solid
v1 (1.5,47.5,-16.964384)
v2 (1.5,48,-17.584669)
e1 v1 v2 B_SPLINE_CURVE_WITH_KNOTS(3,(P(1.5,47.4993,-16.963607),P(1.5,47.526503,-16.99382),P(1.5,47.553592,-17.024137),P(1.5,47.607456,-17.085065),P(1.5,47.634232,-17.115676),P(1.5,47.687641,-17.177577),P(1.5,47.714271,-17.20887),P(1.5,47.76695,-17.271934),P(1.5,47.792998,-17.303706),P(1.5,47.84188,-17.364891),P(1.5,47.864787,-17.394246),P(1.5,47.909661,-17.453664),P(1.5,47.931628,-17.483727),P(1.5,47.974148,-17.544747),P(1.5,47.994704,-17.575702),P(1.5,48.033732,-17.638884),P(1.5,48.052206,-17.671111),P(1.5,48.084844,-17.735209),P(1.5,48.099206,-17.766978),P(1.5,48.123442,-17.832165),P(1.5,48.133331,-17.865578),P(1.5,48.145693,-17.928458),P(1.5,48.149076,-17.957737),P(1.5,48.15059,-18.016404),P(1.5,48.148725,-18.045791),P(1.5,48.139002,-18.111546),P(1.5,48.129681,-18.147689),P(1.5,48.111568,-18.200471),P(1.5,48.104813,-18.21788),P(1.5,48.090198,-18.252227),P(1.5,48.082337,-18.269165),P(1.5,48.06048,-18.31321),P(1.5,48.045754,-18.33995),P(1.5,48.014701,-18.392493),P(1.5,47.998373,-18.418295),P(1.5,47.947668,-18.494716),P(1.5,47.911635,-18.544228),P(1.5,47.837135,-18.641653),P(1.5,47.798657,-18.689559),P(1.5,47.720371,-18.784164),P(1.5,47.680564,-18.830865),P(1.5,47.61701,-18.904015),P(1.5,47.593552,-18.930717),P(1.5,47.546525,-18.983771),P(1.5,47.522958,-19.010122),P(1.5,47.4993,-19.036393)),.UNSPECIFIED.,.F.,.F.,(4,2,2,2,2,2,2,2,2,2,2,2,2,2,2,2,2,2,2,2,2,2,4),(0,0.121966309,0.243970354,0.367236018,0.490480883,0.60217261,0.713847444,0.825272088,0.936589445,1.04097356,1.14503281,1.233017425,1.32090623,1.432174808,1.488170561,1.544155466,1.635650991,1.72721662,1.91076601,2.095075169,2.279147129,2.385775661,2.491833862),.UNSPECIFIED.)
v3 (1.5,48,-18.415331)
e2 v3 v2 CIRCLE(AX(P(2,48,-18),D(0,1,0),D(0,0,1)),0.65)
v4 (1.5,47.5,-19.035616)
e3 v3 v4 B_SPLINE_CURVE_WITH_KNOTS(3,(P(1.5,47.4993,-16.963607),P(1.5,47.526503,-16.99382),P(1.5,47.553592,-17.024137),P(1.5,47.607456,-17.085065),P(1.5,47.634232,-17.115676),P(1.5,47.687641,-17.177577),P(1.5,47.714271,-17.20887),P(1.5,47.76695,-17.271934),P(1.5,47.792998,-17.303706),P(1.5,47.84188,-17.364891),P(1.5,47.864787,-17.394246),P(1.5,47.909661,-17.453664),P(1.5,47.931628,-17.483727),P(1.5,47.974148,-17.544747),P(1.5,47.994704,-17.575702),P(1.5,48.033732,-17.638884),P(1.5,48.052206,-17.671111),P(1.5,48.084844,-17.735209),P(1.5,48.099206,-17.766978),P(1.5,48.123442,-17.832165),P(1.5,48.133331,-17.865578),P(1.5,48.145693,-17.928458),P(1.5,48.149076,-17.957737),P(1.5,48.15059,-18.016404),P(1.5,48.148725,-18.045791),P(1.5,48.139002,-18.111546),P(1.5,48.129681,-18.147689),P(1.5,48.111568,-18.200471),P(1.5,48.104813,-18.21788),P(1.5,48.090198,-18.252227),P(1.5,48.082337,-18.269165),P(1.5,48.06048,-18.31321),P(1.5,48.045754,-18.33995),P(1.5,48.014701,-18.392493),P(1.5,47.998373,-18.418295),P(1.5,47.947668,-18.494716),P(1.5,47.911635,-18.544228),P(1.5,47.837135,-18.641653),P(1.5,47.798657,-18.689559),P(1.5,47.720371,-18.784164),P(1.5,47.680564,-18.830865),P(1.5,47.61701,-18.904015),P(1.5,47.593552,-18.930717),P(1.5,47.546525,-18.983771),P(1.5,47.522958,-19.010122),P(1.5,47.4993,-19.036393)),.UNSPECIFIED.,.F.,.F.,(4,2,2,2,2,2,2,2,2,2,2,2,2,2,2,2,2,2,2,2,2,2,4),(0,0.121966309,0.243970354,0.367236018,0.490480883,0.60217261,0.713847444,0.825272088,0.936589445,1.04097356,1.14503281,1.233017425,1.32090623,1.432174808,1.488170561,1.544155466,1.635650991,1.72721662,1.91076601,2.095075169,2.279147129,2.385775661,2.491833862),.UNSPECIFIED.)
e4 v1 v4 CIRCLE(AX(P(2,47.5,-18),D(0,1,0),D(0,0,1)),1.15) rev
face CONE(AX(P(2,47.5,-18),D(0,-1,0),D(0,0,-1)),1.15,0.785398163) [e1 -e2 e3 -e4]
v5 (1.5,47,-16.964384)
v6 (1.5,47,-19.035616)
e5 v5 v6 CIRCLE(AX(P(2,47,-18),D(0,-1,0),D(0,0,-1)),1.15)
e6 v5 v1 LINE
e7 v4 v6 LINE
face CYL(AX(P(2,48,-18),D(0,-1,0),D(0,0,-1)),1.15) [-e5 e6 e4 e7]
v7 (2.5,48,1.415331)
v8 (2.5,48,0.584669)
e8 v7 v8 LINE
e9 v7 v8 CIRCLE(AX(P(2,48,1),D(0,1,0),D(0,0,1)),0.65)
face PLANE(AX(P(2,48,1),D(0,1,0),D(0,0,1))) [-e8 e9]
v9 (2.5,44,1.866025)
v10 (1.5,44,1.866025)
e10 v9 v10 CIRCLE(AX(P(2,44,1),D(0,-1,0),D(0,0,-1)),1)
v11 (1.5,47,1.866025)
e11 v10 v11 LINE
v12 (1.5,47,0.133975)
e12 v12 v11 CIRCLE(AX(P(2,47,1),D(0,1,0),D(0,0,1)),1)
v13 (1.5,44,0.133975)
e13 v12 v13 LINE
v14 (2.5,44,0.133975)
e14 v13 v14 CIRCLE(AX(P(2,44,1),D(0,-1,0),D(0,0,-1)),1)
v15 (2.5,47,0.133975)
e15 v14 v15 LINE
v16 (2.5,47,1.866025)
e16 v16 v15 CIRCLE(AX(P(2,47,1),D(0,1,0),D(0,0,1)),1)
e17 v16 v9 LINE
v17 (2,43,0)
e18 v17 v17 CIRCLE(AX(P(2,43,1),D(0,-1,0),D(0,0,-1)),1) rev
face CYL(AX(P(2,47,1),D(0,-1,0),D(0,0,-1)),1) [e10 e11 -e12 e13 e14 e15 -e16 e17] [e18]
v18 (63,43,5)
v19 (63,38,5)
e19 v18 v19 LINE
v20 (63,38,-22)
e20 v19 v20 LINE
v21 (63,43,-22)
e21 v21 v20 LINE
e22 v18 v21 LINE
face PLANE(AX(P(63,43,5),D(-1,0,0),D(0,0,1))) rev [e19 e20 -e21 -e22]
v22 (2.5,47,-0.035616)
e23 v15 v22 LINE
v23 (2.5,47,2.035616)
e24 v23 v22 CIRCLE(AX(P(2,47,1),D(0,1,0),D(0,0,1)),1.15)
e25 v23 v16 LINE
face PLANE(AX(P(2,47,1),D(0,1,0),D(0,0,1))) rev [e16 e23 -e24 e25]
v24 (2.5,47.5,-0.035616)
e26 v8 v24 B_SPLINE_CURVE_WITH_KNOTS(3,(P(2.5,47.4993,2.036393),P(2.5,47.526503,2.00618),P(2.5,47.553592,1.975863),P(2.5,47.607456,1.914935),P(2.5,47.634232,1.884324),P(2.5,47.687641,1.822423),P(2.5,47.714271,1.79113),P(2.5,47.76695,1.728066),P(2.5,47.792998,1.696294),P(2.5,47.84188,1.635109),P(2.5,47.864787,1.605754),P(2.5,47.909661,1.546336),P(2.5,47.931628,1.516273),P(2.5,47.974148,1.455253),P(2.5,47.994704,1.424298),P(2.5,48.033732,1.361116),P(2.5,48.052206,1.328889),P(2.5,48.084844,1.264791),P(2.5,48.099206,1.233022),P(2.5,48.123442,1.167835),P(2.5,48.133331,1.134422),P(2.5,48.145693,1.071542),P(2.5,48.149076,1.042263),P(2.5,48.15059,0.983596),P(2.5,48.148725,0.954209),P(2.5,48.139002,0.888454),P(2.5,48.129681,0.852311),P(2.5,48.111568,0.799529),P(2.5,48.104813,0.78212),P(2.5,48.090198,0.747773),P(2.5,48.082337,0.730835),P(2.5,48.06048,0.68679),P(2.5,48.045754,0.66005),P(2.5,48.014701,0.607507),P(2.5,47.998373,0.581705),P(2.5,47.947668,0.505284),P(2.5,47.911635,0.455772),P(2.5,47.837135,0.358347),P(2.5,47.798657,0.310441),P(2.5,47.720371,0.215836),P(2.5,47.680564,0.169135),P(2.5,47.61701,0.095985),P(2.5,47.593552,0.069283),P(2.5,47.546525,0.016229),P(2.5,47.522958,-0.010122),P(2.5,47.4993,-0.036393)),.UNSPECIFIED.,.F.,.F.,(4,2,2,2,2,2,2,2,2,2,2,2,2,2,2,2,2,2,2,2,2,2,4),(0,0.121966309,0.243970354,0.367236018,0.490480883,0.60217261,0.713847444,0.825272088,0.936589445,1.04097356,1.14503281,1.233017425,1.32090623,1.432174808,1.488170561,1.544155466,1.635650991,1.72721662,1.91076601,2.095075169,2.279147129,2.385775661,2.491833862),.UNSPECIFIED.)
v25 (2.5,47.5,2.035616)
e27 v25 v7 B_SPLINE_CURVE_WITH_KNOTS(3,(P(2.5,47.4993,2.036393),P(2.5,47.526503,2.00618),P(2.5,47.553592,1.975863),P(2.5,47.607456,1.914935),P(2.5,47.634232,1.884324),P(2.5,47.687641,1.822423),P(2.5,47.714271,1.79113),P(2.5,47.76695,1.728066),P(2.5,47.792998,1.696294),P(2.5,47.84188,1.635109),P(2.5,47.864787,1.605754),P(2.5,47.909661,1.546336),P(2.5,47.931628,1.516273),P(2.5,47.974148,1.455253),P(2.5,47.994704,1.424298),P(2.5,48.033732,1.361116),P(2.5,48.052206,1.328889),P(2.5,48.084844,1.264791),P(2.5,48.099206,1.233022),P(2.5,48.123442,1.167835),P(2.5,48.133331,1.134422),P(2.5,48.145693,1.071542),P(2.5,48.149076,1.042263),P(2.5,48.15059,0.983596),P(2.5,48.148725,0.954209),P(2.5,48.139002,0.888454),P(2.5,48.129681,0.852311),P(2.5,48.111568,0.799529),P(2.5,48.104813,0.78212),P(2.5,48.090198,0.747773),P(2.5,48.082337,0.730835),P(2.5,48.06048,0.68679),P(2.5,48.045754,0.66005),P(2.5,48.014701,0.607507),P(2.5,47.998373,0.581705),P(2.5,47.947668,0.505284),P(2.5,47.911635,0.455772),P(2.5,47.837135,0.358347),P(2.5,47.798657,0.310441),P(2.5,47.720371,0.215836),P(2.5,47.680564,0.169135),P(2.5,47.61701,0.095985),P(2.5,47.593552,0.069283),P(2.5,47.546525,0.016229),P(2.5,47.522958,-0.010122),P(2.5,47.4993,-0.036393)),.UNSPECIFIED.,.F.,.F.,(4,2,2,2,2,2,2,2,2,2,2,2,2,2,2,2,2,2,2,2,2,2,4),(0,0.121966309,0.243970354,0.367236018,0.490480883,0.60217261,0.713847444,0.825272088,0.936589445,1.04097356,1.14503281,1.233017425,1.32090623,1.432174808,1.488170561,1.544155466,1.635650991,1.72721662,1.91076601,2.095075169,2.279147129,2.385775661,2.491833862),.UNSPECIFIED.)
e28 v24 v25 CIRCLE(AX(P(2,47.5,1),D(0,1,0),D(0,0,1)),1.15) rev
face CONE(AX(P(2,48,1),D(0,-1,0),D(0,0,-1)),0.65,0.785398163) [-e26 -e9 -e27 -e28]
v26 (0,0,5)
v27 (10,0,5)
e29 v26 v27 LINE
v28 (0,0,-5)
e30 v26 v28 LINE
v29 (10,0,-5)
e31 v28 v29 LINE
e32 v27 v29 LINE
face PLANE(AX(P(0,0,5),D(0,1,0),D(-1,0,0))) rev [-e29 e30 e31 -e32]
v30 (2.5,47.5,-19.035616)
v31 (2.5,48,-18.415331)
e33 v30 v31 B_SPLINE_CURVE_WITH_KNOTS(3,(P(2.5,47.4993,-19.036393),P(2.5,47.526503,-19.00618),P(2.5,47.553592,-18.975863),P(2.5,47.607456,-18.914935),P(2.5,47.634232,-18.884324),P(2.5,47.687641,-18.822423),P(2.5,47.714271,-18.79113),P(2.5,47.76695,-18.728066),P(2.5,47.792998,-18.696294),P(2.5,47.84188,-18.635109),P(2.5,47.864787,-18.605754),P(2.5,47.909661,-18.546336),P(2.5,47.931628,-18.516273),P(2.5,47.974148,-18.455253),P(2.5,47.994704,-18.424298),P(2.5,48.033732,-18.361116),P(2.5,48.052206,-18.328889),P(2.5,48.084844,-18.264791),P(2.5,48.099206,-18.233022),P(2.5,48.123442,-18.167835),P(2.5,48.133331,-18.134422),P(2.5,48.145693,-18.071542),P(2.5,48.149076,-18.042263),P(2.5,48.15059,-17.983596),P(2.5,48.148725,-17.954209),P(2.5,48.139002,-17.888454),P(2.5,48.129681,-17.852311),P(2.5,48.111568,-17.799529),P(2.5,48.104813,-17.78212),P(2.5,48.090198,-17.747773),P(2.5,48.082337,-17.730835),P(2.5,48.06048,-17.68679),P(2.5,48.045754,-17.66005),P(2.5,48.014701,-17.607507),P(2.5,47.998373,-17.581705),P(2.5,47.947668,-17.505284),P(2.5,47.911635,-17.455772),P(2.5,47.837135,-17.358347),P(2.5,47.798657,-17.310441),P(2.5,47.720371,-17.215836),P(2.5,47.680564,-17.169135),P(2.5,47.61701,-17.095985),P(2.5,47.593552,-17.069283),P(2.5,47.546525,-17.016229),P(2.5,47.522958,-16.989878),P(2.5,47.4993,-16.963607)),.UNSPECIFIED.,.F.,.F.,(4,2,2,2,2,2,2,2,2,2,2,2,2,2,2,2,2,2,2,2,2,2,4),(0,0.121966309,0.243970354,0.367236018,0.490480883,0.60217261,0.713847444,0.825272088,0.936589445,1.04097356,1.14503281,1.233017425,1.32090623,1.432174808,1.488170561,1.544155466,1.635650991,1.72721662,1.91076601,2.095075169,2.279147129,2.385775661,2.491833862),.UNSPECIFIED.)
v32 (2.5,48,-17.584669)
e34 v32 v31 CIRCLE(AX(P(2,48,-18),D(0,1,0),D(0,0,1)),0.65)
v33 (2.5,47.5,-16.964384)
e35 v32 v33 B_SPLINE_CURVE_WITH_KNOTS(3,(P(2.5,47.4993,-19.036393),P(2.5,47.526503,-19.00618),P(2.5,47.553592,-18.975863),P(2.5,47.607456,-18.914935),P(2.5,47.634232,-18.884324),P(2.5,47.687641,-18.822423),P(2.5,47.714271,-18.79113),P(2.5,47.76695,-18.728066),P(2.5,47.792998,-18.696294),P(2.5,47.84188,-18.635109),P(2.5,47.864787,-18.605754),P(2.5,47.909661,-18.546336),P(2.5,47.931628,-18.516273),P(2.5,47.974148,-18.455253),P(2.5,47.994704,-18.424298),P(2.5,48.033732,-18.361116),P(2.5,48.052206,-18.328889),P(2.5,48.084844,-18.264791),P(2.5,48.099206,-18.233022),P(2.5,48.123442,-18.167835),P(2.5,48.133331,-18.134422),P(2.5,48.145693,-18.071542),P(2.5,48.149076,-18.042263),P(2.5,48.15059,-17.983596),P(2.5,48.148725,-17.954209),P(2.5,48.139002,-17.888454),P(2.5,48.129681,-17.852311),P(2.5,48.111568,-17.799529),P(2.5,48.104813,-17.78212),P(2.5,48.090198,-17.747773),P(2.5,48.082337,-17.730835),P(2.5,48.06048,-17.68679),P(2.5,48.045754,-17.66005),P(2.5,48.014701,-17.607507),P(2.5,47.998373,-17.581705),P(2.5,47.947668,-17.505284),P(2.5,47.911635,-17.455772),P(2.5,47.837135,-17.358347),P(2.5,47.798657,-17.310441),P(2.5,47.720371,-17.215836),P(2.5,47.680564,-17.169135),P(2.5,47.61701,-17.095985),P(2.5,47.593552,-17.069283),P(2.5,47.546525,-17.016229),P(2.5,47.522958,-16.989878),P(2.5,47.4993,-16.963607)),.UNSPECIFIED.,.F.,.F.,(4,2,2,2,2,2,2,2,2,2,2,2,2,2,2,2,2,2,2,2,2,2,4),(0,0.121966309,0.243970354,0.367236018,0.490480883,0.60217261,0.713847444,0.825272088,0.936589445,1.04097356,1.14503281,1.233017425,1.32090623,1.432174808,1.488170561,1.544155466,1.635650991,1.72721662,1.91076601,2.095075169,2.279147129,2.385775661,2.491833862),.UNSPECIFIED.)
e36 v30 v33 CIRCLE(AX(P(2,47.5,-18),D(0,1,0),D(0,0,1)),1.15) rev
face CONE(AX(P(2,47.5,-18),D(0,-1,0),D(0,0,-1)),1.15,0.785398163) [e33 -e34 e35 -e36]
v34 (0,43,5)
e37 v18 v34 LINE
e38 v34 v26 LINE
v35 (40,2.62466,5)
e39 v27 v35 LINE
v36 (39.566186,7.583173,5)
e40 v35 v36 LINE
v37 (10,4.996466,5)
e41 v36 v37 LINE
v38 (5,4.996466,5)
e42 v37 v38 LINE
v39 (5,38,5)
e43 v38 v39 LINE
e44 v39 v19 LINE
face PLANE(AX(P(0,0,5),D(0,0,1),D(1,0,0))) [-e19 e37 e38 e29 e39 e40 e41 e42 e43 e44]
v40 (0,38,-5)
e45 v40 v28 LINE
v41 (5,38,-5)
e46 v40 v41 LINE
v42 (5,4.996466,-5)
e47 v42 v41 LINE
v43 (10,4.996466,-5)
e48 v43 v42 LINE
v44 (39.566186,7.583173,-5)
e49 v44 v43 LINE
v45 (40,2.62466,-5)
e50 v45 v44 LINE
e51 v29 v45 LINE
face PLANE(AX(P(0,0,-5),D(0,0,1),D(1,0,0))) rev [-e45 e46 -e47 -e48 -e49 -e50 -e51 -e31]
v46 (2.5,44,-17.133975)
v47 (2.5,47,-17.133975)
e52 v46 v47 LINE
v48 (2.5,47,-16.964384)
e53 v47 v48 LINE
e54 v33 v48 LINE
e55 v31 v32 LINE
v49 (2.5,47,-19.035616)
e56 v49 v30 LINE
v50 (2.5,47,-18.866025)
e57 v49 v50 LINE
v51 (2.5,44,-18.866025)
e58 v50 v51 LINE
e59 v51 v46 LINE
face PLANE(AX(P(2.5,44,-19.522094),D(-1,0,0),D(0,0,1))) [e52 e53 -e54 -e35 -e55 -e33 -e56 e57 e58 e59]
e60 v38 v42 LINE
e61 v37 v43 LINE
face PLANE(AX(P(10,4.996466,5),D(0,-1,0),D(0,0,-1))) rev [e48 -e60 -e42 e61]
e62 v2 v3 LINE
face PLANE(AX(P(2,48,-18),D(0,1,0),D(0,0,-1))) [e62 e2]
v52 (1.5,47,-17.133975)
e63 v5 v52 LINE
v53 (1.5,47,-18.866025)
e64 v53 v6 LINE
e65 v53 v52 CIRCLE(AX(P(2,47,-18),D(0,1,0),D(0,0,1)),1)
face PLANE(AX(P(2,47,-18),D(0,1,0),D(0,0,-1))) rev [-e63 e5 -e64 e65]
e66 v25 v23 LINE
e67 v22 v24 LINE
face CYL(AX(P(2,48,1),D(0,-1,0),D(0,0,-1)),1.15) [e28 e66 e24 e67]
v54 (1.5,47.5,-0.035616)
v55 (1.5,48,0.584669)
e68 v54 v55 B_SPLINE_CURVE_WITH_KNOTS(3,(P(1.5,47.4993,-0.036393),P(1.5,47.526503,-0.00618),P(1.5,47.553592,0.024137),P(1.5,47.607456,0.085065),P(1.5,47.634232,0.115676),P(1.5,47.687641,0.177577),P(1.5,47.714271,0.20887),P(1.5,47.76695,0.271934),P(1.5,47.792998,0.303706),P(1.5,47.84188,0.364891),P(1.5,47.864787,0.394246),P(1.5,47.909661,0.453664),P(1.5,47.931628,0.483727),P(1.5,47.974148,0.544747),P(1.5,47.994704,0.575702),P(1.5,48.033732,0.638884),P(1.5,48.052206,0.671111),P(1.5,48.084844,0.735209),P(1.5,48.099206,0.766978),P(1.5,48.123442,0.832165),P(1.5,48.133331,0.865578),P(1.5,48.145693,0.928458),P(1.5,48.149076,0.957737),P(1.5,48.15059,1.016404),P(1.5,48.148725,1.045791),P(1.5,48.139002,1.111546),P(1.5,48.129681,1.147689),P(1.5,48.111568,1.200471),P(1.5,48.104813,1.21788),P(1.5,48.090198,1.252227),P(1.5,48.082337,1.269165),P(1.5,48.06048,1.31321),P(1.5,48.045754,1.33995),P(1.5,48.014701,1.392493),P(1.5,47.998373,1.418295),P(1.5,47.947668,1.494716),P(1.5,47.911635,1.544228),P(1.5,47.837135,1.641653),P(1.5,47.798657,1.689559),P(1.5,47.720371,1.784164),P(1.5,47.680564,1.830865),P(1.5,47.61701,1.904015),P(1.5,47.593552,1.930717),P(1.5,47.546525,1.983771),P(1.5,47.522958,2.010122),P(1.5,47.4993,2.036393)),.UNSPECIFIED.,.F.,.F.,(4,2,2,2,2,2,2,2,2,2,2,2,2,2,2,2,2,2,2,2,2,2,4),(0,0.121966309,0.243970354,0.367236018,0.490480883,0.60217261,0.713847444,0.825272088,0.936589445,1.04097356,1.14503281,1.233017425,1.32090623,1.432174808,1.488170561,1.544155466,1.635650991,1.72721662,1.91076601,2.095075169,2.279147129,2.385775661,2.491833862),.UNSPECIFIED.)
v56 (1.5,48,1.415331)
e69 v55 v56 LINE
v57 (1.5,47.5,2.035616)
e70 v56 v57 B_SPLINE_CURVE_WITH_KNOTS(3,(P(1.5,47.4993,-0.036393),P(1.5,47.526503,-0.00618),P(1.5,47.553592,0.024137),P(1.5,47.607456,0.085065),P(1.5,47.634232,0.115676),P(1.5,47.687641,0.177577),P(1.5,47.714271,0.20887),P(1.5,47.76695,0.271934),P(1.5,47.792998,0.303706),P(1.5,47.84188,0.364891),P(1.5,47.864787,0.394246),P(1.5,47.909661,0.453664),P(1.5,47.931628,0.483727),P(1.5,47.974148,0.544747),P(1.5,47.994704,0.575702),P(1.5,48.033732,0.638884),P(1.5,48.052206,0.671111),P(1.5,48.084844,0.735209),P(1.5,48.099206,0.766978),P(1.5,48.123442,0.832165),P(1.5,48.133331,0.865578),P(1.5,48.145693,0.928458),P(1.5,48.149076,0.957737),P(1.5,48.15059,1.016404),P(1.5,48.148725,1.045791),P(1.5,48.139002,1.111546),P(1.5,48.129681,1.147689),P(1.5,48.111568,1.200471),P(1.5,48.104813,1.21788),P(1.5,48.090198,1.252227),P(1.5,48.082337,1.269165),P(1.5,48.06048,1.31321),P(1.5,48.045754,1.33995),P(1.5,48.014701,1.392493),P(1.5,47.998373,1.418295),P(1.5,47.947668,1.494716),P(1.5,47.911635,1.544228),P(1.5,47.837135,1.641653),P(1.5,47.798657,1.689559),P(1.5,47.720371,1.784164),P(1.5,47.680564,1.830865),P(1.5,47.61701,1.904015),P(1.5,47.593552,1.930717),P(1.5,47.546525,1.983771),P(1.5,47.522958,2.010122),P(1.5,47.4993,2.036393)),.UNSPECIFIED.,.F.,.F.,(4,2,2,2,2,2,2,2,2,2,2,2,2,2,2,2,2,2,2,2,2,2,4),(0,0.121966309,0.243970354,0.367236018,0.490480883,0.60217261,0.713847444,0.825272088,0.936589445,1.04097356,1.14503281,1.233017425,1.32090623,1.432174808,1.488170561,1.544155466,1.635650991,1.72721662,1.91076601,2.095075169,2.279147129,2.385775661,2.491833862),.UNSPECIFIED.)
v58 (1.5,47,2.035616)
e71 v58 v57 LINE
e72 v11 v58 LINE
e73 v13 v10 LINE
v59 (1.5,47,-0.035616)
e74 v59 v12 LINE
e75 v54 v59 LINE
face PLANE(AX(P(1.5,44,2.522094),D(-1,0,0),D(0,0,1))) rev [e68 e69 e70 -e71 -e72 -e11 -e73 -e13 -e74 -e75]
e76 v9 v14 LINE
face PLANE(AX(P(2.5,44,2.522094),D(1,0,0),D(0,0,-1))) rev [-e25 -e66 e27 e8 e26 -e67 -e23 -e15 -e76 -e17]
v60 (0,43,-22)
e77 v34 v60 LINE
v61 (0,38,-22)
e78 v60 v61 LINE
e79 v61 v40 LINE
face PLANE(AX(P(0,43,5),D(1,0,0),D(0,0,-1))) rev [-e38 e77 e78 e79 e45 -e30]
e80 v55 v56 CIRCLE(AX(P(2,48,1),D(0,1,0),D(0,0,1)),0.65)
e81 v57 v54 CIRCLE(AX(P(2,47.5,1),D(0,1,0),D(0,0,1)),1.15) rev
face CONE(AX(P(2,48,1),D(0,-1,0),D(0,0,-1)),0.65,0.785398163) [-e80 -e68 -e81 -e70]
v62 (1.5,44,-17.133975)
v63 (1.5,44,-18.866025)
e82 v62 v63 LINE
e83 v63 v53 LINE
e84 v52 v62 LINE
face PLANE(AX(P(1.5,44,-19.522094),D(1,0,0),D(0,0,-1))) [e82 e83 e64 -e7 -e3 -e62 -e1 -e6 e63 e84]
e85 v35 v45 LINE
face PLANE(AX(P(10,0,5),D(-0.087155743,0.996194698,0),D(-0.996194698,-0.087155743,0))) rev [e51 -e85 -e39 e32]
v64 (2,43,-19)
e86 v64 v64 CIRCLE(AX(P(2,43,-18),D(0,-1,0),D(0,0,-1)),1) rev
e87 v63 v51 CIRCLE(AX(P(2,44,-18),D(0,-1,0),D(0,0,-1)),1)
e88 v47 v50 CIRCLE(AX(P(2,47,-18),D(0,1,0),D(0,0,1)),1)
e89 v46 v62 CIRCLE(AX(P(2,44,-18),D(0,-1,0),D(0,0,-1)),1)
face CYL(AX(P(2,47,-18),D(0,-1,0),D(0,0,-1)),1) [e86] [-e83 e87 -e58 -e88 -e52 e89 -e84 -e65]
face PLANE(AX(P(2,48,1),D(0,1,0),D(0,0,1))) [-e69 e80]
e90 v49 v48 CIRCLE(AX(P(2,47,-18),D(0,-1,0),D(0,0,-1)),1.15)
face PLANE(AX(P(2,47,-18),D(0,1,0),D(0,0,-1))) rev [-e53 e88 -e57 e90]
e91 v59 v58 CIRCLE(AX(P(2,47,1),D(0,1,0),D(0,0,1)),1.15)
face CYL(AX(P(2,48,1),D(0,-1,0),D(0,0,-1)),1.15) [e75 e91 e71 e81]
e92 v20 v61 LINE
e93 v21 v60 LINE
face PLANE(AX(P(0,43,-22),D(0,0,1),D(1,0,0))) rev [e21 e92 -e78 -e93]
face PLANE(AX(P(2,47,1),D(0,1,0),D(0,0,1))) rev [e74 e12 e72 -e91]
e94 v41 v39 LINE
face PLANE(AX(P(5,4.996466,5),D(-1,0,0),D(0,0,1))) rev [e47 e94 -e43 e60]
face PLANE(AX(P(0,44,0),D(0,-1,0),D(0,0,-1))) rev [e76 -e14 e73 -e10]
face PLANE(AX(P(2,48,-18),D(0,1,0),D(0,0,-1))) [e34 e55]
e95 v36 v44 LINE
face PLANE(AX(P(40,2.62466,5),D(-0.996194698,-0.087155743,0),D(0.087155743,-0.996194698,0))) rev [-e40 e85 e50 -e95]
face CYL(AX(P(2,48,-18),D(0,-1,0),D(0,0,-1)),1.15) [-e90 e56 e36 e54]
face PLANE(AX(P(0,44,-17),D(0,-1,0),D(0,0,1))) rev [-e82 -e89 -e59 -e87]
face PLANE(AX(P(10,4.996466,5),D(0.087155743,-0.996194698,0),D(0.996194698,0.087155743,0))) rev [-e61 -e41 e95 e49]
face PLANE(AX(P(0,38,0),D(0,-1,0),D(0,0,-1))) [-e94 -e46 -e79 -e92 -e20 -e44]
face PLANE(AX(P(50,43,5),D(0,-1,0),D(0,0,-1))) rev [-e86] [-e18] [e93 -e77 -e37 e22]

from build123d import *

# Parameters (mm, degrees)
BOSS_EXTRUDE1_DEPTH = 5
SKETCH3_W           = 63
SKETCH3_H           = 27
BOSS_EXTRUDE3_DEPTH = 2.5
SKETCH4_R           = 1
BOSS_EXTRUDE6_DEPTH = 4
SKETCH5_W           = 1
SKETCH5_H           = 3.04418771
CUT_EXTRUDE1_DEPTH  = 3
SKETCH6_R           = 1.15
BOSS_EXTRUDE7_DEPTH = 1
CHAMFER1_SIZE       = 0.5
SKETCH7_W           = 1
SKETCH7_H           = 2.786400566
CUT_EXTRUDE3_DEPTH  = 1
MIRROR2_START       = 47
MIRROR2_DEPTH       = 1


with BuildPart() as part:
    # Sketch1 → Boss-Extrude1 (new, symmetric)
    with BuildSketch(Plane.XY):
        Polygon((0, 0), (10, 0), (40, 2.624659906), (39.566186352, 7.583172591), (10, 4.996466462), (5, 4.996466462), (5, 38.996466462), (50, 38.996466462), (50, 43), (0, 43), align=None)
    extrude(amount=BOSS_EXTRUDE1_DEPTH, both=True)

    # Sketch3 → Boss-Extrude3 (add, symmetric)
    with BuildSketch(Plane(origin=(0, 40.5, 0), x_dir=(1, 0, 0), z_dir=(0, 1, 0))):
        with Locations((31.5, 8.5)):
            Rectangle(SKETCH3_W, SKETCH3_H)
    extrude(amount=BOSS_EXTRUDE3_DEPTH, both=True)

    # Sketch4 → Boss-Extrude6 (add)
    with BuildSketch(Plane(origin=(0, 43, 0), x_dir=(1, 0, 0), z_dir=(0, 1, 0))):
        with Locations(Location((2, -1, 0), (0, 0, 90))):
            Circle(SKETCH4_R)
        with Locations(Location((2, 18, 0), (0, 0, 90))):
            Circle(SKETCH4_R)
    extrude(amount=BOSS_EXTRUDE6_DEPTH)

    # Sketch5 → Cut-Extrude1 (cut)
    with BuildSketch(Plane(origin=(0, 47, 0), x_dir=(1, 0, 0), z_dir=(0, 1, 0))):
        with Locations((2, -1)):
            Rectangle(SKETCH5_W, SKETCH5_H)
    cut_extrude1 = extrude(amount=-CUT_EXTRUDE1_DEPTH, mode=Mode.SUBTRACT)

    # Mirror1: Cut-Extrude1 across plane
    add(cut_extrude1.mirror(Plane.XY.offset(-8.5)), mode=Mode.SUBTRACT)

    # Sketch6 → Boss-Extrude7 (add)
    with BuildSketch(Plane(origin=(0, 47, 0), x_dir=(1, 0, 0), z_dir=(0, 1, 0))):
        with Locations(Location((2, -1, 0), (0, 0, 270))):
            Circle(SKETCH6_R)
    extrude(amount=BOSS_EXTRUDE7_DEPTH)

    # Chamfer1
    chamfer1_edges = [part.edges().sort_by_distance(p)[0] for p in [
        (2, 48, -0.15),
    ]]
    chamfer(chamfer1_edges, length=CHAMFER1_SIZE)

    # Sketch7 → Cut-Extrude3 (cut)
    with BuildSketch(Plane(origin=(0, 48, 0), x_dir=(1, 0, 0), z_dir=(0, 1, 0))):
        with Locations((2, -1)):
            Rectangle(SKETCH7_W, SKETCH7_H)
    extrude(amount=-CUT_EXTRUDE3_DEPTH, mode=Mode.SUBTRACT)

    # Mirror2: read off the stored shape, not the designer's step
    # Mirror2 outline → Mirror2 (add)
    with BuildSketch(Plane(origin=(0, 0, 0), x_dir=(1, 0, 0), z_dir=(0, 1, 0)).offset(MIRROR2_START)):
        with BuildLine():
            ThreePointArc((2.5, 16.964384241), (3.15, 18), (2.5, 19.035615759))
            Line((2.5, 19.035615759), (2.5, 16.964384241))
        make_face()
        with BuildLine():
            ThreePointArc((1.5, 19.035615759), (0.85, 18), (1.5, 16.964384241))
            Line((1.5, 16.964384241), (1.5, 19.035615759))
        make_face()
    extrude(amount=MIRROR2_DEPTH)

    # Mirror2 2 outline → Mirror2 2 (revolve, cut)
    with BuildSketch(Plane(origin=(2, 0, -18), x_dir=(1, 0, 0), z_dir=(0, 0, 1))):
        Polygon((1.150000012, 48.000000304), (0.649999696, 48.000000304), (1.150000012, 47.499999988), align=None)
    revolve(axis=Axis((2, 0, -18), (0, 1, 0)), mode=Mode.SUBTRACT)


solid = part.part
